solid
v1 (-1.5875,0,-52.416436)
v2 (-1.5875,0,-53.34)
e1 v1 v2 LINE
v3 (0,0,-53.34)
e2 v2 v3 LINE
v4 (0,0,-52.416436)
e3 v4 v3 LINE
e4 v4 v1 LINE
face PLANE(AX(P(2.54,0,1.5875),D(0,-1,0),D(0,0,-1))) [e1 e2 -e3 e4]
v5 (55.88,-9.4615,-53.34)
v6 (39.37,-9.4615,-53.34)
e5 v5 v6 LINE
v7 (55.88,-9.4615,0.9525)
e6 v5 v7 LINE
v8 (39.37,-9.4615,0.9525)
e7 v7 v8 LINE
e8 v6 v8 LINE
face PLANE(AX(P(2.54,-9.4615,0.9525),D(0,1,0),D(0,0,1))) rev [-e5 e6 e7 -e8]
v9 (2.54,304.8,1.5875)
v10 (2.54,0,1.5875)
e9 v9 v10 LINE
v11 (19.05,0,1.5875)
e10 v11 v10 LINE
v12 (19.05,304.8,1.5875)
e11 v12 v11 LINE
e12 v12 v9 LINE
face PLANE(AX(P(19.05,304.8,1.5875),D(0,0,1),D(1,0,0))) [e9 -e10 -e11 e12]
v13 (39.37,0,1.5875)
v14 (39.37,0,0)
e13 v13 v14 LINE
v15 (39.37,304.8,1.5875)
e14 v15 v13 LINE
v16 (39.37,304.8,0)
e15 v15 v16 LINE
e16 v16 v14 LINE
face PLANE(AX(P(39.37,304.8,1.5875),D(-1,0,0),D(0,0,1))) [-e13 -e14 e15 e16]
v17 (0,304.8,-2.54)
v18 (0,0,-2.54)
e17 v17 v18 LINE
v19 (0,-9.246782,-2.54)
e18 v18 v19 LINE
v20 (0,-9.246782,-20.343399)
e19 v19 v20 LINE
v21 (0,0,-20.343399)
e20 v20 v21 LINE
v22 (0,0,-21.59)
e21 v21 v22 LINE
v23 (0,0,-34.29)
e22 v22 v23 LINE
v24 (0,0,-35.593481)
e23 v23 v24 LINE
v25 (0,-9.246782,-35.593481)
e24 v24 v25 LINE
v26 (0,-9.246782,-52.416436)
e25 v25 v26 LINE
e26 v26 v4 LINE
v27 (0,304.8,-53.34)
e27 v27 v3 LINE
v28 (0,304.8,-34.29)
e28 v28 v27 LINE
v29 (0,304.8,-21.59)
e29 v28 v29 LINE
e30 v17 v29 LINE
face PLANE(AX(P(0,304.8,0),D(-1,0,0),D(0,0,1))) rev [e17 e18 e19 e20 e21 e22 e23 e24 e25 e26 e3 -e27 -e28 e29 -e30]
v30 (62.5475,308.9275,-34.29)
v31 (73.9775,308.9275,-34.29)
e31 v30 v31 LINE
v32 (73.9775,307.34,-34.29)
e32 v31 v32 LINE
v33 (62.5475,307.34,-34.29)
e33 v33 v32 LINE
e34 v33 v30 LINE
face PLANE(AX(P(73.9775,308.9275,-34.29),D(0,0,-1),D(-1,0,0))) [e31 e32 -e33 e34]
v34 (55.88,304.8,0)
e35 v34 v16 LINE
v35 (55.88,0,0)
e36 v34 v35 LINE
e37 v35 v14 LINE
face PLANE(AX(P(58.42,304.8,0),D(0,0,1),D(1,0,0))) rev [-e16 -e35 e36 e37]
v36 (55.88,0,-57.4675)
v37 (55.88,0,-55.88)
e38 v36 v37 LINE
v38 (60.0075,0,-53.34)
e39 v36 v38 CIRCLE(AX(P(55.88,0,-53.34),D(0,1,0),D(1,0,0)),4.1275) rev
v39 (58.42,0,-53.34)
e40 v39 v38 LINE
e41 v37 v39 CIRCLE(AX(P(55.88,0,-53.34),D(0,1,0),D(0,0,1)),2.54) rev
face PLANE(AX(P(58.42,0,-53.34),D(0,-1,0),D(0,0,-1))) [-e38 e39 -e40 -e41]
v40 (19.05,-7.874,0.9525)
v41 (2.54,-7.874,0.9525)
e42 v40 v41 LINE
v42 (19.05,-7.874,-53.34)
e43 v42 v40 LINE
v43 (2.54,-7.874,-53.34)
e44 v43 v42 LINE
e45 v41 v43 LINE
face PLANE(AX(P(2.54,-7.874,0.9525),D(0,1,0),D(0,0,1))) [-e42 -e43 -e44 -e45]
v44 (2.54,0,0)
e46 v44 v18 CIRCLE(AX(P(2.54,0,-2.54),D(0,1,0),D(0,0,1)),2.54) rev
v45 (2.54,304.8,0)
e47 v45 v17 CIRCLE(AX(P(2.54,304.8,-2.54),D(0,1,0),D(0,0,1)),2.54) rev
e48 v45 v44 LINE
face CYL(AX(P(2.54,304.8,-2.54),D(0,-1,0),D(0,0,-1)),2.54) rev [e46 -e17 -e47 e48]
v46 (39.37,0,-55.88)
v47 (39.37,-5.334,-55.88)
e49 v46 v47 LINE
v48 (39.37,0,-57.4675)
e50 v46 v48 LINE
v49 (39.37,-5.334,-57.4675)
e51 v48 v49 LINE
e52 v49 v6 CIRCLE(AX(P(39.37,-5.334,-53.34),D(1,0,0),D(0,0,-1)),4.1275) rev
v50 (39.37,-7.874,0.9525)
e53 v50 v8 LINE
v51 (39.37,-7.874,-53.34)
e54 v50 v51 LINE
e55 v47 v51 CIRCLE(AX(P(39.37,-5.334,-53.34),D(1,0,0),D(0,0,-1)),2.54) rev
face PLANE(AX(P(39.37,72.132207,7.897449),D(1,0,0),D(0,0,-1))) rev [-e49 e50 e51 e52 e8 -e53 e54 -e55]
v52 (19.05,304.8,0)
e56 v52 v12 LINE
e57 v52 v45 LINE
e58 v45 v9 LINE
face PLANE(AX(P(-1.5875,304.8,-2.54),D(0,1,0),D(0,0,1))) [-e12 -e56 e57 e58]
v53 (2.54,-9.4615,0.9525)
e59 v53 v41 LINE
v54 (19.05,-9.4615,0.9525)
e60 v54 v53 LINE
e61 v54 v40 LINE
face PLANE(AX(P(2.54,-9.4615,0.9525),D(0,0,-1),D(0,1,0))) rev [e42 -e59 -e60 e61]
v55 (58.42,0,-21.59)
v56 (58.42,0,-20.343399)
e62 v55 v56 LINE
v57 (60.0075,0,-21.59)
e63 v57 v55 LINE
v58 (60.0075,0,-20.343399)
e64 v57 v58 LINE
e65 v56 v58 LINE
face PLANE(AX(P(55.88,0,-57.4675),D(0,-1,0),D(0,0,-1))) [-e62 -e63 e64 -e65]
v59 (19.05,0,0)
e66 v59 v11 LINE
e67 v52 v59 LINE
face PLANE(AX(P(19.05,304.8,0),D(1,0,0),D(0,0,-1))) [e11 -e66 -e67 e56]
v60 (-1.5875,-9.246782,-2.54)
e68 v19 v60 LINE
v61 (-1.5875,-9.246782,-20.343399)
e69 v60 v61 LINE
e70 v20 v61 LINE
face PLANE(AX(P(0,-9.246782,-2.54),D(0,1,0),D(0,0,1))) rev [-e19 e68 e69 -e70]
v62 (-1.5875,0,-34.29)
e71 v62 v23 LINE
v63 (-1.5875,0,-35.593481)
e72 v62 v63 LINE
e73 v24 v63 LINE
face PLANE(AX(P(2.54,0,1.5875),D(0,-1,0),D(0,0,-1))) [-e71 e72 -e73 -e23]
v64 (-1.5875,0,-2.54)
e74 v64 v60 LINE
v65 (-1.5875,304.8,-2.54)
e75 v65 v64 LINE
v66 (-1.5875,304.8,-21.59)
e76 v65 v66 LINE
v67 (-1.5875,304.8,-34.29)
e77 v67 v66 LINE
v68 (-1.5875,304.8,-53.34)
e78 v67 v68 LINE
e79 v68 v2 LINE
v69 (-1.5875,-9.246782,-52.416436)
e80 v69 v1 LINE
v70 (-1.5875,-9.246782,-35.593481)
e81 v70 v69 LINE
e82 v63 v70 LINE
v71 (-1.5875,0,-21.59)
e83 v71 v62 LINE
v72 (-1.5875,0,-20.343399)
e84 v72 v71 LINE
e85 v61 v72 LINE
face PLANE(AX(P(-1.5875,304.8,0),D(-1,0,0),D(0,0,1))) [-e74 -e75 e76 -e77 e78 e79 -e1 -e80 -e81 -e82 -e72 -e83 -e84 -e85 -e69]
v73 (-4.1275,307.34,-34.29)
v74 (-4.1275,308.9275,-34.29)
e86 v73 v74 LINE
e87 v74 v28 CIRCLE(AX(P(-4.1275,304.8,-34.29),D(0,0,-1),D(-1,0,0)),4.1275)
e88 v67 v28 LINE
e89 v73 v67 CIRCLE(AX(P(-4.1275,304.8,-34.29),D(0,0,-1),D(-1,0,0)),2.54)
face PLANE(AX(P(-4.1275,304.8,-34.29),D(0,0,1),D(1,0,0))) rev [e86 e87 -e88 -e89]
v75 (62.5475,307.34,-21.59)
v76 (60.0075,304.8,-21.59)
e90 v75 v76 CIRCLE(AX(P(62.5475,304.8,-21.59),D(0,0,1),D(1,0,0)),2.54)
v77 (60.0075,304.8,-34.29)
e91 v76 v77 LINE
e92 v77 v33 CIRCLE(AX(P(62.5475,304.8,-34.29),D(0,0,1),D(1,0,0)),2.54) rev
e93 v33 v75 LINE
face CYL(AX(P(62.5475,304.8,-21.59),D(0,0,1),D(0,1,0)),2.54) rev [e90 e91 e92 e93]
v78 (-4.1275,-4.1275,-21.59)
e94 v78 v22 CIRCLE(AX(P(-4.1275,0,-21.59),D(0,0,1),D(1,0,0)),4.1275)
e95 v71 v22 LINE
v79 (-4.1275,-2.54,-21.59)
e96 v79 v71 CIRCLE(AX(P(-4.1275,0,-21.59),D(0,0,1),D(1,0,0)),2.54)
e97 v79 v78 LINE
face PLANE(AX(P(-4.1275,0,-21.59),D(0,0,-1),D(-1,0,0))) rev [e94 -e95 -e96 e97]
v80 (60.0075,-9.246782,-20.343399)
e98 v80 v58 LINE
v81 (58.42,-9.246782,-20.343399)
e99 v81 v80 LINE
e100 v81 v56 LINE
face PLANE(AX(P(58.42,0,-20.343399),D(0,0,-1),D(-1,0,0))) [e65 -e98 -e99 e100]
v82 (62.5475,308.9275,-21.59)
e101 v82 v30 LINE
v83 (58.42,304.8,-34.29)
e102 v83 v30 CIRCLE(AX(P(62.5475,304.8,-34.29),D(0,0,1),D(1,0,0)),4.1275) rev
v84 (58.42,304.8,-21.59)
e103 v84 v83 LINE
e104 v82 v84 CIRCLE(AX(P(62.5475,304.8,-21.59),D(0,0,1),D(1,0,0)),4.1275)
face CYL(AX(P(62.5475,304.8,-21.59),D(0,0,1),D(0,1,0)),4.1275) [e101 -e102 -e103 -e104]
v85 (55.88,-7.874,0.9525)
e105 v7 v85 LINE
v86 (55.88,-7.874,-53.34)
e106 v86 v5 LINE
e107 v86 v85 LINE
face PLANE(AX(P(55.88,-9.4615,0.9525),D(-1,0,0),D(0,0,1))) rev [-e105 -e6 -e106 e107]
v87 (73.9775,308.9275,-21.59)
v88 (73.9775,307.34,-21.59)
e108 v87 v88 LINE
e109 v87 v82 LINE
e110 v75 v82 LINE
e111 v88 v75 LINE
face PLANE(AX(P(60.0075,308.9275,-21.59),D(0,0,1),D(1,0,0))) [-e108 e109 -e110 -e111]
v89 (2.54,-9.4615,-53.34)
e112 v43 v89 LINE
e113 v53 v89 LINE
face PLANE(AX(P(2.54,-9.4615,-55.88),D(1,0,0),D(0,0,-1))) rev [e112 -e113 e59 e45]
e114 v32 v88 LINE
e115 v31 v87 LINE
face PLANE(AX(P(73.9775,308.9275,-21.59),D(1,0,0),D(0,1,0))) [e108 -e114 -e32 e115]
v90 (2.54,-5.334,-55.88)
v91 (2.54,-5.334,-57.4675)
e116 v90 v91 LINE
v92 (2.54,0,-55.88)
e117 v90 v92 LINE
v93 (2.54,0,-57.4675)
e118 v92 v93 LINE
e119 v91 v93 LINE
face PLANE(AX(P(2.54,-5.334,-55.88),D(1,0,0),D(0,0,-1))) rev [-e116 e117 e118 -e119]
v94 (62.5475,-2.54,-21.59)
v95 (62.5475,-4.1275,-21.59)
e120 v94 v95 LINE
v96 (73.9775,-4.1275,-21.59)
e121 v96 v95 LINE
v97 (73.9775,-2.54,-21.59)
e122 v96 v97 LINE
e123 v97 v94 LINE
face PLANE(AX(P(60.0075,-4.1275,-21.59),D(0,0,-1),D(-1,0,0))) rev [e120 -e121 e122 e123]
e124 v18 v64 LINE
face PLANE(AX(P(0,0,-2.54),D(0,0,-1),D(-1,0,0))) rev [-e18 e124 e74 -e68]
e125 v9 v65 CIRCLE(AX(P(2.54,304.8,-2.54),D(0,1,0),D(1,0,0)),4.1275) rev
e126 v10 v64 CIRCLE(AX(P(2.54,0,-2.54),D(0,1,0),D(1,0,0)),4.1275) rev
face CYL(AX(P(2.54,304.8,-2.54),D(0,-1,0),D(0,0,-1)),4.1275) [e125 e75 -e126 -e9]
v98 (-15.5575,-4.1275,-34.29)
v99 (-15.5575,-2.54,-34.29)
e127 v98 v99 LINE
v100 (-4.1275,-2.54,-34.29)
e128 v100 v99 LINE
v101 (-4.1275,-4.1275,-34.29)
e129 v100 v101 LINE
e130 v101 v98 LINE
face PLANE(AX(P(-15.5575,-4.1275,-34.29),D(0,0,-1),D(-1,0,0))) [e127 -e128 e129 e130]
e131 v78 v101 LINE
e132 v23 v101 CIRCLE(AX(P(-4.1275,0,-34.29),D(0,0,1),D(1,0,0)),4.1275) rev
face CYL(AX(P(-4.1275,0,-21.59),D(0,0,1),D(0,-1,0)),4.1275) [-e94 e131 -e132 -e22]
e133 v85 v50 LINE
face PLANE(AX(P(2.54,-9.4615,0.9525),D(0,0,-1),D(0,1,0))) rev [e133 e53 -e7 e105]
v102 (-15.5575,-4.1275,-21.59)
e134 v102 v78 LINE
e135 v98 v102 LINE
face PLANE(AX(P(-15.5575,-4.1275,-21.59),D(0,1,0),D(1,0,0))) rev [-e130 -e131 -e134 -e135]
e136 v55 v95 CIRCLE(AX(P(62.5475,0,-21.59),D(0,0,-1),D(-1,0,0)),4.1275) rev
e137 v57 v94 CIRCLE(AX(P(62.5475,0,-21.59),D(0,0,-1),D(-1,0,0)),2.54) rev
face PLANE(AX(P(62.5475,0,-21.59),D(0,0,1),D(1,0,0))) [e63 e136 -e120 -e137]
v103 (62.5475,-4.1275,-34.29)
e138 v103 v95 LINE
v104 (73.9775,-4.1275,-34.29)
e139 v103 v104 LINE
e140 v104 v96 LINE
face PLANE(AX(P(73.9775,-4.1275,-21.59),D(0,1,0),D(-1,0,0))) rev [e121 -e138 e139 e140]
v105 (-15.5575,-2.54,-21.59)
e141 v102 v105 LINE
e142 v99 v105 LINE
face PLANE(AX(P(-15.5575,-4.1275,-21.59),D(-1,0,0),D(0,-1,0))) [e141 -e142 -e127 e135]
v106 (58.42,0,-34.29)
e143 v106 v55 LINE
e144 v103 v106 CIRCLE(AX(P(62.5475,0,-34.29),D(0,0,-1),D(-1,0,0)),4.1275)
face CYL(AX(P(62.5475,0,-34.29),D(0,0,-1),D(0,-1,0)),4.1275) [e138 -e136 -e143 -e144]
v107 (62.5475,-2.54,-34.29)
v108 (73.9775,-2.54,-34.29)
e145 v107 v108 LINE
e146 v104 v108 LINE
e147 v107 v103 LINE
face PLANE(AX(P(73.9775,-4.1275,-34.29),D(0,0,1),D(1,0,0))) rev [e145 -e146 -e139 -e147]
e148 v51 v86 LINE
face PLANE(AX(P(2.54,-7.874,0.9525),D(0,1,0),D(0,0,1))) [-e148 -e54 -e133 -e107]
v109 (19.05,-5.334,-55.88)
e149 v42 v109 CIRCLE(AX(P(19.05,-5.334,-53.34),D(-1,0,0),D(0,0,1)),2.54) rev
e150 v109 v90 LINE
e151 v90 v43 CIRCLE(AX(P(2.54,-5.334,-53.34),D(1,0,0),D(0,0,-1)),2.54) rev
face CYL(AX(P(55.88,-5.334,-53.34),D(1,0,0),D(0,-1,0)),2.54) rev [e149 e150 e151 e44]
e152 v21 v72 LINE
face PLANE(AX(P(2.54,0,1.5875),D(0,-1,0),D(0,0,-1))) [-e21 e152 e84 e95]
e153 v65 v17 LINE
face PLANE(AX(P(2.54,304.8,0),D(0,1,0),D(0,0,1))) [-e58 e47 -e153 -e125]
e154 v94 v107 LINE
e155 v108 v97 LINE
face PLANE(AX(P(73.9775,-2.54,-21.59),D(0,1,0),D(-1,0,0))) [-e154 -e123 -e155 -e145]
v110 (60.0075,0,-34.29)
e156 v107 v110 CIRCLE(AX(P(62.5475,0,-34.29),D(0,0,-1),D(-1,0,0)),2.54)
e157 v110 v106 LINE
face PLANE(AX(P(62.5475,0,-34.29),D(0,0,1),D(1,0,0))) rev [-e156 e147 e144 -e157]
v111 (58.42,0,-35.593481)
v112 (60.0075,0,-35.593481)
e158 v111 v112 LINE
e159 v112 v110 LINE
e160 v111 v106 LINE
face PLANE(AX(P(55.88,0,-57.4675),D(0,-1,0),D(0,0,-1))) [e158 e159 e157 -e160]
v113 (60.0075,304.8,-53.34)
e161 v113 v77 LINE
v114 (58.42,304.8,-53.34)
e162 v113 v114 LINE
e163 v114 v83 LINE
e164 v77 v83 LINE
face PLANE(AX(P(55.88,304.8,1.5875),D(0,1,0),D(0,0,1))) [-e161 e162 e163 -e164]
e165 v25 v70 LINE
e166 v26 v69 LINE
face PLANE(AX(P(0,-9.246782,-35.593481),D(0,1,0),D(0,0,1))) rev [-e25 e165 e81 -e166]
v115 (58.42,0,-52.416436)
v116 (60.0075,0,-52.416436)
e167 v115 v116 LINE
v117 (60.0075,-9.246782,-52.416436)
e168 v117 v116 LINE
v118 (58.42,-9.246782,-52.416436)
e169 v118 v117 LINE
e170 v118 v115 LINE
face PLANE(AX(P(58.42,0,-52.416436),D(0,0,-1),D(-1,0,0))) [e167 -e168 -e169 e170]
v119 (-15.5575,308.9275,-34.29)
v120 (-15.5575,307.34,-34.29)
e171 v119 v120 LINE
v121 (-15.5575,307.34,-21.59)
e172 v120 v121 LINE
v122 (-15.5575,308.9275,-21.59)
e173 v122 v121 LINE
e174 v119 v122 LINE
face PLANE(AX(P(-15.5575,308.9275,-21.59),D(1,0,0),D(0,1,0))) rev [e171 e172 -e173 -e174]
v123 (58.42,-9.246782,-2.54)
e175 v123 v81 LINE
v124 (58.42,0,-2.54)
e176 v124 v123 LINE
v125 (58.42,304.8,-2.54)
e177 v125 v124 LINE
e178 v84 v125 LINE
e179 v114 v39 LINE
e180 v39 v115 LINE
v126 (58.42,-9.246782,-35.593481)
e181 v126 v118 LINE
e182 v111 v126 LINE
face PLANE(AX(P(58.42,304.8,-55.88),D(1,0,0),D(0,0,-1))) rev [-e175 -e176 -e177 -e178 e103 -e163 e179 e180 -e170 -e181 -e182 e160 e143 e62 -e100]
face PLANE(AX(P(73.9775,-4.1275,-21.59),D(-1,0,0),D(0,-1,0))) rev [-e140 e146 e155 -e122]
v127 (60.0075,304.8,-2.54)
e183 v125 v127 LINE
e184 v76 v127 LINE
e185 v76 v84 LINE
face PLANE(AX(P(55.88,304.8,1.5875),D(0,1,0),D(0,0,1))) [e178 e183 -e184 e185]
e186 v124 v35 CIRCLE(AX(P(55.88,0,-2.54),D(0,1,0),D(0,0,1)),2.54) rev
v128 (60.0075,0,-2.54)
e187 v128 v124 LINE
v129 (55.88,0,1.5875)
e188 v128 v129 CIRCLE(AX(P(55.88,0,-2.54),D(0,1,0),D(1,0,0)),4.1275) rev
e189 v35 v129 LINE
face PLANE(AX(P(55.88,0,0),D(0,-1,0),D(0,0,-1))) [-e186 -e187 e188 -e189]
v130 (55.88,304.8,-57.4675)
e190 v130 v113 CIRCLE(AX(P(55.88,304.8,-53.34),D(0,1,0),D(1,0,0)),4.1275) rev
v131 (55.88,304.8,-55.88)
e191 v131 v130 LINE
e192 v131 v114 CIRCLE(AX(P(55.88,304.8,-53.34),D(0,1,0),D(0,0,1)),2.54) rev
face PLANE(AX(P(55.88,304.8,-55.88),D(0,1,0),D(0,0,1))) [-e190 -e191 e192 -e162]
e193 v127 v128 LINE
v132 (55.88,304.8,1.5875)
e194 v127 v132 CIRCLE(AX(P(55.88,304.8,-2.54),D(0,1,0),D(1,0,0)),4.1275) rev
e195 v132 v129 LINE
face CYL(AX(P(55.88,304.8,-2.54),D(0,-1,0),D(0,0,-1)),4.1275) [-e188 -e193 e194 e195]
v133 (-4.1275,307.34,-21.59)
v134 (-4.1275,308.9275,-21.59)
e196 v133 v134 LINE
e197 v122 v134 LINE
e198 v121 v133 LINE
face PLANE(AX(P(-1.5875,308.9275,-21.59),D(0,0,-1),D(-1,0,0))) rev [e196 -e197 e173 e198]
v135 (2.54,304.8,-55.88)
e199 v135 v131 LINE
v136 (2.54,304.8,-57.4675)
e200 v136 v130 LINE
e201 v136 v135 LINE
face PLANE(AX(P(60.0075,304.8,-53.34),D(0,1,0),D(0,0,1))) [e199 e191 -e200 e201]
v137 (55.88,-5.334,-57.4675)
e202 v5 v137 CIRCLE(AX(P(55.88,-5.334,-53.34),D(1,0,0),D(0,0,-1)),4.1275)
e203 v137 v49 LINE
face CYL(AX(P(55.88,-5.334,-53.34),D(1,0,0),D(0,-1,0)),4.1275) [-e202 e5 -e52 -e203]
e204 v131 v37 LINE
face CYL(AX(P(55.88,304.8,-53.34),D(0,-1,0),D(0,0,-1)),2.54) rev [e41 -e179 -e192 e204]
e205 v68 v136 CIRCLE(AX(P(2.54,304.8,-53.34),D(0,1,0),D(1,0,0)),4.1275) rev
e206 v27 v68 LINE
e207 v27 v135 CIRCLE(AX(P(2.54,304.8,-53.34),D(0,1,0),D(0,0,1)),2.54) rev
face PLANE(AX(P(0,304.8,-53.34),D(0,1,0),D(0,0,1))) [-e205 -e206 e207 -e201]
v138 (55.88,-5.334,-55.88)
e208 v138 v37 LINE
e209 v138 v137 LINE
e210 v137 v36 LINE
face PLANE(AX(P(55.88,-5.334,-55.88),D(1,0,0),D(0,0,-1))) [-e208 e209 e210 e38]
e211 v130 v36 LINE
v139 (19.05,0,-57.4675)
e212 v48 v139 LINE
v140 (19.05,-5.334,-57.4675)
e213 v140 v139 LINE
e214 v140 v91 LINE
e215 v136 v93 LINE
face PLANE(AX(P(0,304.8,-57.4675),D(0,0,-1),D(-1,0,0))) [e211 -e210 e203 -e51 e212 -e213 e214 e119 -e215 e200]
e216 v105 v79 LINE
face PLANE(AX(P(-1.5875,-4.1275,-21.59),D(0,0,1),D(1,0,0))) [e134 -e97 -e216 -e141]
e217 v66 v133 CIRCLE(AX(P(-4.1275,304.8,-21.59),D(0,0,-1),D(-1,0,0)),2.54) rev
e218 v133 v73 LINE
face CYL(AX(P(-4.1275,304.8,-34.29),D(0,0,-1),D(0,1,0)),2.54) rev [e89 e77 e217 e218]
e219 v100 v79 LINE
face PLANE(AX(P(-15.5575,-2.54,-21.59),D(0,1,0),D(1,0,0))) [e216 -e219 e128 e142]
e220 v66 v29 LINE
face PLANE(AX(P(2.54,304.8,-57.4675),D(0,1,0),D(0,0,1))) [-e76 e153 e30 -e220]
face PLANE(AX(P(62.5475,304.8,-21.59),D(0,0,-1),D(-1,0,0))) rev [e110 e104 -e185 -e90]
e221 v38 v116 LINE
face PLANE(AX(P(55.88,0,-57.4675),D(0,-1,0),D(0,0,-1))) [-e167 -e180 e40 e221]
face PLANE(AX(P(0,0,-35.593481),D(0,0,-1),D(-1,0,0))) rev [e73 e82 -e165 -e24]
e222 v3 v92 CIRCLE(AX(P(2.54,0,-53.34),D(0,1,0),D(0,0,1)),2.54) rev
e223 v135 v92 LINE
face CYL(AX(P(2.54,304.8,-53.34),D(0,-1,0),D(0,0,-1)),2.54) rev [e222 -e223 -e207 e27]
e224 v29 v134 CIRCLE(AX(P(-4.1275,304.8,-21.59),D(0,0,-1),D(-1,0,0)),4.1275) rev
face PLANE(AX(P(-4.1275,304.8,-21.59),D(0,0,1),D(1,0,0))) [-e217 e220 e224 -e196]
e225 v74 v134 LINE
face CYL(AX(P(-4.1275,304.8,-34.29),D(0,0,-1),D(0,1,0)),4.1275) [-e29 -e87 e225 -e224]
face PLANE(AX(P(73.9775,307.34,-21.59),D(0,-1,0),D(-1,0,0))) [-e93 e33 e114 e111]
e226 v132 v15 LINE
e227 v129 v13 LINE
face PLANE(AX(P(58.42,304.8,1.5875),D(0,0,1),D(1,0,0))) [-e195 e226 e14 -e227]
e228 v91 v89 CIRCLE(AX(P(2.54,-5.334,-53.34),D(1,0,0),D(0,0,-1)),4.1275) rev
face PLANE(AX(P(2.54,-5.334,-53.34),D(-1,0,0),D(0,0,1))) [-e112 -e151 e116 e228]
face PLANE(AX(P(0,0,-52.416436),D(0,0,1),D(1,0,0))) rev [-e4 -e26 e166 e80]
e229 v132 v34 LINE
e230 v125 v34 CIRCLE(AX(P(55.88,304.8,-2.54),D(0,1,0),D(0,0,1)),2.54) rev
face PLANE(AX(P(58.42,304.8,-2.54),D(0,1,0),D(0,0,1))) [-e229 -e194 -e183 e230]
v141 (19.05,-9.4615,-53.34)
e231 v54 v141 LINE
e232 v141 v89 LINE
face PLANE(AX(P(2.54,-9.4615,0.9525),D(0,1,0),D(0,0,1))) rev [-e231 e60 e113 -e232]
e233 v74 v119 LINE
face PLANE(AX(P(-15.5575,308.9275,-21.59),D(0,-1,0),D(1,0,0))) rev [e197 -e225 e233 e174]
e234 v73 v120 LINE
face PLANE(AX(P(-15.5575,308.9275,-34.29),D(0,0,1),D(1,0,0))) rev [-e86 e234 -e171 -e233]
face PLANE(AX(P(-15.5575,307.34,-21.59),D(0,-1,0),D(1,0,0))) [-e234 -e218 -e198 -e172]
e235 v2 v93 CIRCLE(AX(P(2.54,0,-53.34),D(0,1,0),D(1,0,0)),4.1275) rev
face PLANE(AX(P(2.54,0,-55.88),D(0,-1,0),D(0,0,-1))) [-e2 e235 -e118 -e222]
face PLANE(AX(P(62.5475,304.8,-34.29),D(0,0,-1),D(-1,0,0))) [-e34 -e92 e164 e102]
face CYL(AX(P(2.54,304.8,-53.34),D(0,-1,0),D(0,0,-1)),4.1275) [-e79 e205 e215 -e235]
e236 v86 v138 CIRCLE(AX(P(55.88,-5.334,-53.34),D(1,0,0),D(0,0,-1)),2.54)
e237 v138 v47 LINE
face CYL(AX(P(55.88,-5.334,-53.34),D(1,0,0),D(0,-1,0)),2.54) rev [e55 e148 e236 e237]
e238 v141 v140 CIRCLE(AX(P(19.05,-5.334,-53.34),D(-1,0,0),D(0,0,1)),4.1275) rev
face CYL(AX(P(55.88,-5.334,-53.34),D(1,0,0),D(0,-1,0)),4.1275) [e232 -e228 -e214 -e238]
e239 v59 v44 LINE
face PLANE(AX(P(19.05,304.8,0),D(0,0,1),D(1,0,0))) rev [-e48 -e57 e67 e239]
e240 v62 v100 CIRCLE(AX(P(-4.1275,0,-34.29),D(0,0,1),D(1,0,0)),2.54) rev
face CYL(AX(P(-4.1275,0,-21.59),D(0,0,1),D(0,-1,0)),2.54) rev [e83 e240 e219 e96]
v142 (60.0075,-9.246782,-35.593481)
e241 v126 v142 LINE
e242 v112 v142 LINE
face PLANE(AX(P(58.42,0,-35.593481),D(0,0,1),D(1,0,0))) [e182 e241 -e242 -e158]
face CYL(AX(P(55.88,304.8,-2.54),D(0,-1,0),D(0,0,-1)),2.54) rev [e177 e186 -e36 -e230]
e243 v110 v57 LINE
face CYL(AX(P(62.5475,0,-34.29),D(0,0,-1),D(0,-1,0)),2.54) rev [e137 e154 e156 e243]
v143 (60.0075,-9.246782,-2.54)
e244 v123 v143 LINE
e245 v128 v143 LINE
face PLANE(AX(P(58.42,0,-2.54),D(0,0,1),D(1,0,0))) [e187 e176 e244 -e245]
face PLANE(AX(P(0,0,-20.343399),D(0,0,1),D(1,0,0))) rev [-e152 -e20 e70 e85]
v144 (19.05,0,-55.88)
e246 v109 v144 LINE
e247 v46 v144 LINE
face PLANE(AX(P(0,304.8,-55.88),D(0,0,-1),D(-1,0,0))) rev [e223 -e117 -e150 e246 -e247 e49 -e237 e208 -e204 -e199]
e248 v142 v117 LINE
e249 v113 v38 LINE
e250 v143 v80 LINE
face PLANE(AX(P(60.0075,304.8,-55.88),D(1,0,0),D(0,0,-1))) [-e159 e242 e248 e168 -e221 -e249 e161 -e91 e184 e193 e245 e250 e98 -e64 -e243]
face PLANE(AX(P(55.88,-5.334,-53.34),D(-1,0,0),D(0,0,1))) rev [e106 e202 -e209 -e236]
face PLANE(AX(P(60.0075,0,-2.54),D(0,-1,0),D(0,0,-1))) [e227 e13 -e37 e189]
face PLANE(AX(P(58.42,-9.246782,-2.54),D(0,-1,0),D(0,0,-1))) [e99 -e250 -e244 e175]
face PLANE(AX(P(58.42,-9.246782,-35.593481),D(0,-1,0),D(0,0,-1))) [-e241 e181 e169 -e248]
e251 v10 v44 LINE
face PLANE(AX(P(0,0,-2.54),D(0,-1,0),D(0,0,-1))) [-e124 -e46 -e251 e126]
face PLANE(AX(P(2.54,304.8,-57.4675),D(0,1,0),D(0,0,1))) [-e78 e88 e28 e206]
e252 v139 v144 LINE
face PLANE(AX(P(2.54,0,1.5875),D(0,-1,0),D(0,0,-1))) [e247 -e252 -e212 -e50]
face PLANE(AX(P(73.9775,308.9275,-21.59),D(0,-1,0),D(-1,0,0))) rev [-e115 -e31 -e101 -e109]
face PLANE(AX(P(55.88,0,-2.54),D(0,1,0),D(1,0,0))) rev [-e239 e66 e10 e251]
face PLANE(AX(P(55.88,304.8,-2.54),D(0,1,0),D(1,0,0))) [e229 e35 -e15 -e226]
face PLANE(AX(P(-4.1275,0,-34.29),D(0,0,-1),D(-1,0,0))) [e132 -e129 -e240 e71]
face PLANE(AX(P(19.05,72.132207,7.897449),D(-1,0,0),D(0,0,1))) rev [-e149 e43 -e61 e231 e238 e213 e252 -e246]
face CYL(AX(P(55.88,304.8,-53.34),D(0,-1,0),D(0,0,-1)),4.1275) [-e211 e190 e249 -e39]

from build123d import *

# Parameters (mm, degrees)
BASE_FLANGE1_DEPTH   = 304.8
EDGE_FLANGE3_DEPTH   = 53.34
SKETCH14_W           = 20.32
SKETCH14_H           = 69.210930463
CUT_EXTRUDE1_DEPTH   = 9.4615
EDGE_FLANGE4_DEPTH   = 12.7
MIRROR2_COPY_1_DEPTH = 12.7
SKETCH22_W           = 17.803399203
SKETCH22_H           = 9.246782325
SKETCH22_W_2         = 16.822955406
TAB1_DEPTH           = 1.5875


# Sheet-metal steps are written as plain solids
with BuildPart() as part:
    # Sketch1 → Base-Flange1 (new body)
    with BuildSketch(Plane(origin=(0, 0, 0), x_dir=(1, 0, 0), z_dir=(0, 1, 0))):
        with BuildLine():
            Line((19.05, 0), (2.54, 0))
            ThreePointArc((2.54, 0), (0.743948776, 0.743948776), (0, 2.54))
            Line((0, 2.54), (0, 53.34))
            ThreePointArc((0, 53.34), (0.743948776, 55.136051224), (2.54, 55.88))
            Line((2.54, 55.88), (55.88, 55.88))
            ThreePointArc((55.88, 55.88), (57.676051224, 55.136051224), (58.42, 53.34))
            Line((58.42, 53.34), (58.42, 2.54))
            ThreePointArc((58.42, 2.54), (57.676051224, 0.743948776), (55.88, 0))
            Line((55.88, 0), (39.37, 0))
            Line((39.37, 0), (39.37, -1.5875))
            Line((39.37, -1.5875), (55.88, -1.5875))
            ThreePointArc((55.88, -1.5875), (58.798583239, -0.378583239), (60.0075, 2.54))
            Line((60.0075, 2.54), (60.0075, 53.34))
            ThreePointArc((60.0075, 53.34), (58.798583239, 56.258583239), (55.88, 57.4675))
            Line((55.88, 57.4675), (2.54, 57.4675))
            ThreePointArc((2.54, 57.4675), (-0.378583239, 56.258583239), (-1.5875, 53.34))
            Line((-1.5875, 53.34), (-1.5875, 2.54))
            ThreePointArc((-1.5875, 2.54), (-0.378583239, -0.378583239), (2.54, -1.5875))
            Line((2.54, -1.5875), (19.05, -1.5875))
            Line((19.05, -1.5875), (19.05, 0))
        make_face()
    extrude(amount=BASE_FLANGE1_DEPTH)

    # Edge-Flange3 section (across the edge) → Edge-Flange3 (add)
    with BuildSketch(Plane(origin=(2.54, -7.874, -55.88), x_dir=(0, 1, 0), z_dir=(1, 0, 0))):
        with BuildLine():
            Line((-1.5875, 2.54), (-1.5875, 56.8325))
            Line((-1.5875, 56.8325), (0, 56.8325))
            Line((0, 56.8325), (0, 2.54))
            ThreePointArc((0, 2.54), (0.743948776, 0.743948776), (2.54, 0))
            Line((2.54, 0), (7.874, 0))
            Line((7.874, 0), (7.874, -1.5875))
            Line((7.874, -1.5875), (2.54, -1.5875))
            ThreePointArc((2.54, -1.5875), (-0.378583239, -0.378583239), (-1.5875, 2.54))
        make_face()
    extrude(amount=EDGE_FLANGE3_DEPTH)

    # Sketch14 → Cut-Extrude1 (cut)
    with BuildSketch(Plane.XZ.offset(9.4615)):
        with Locations((29.21, -26.70801644)):
            Rectangle(SKETCH14_W, SKETCH14_H)
    extrude(amount=-CUT_EXTRUDE1_DEPTH, mode=Mode.SUBTRACT)

    # Edge-Flange4 section (across the edge) → Edge-Flange4 (add)
    with BuildSketch(Plane(origin=(-1.5875, 307.34, -21.59), x_dir=(0, -1, 0), z_dir=(0, 0, -1))):
        with BuildLine():
            Line((-1.5875, 2.54), (-1.5875, 13.97))
            Line((-1.5875, 13.97), (0, 13.97))
            Line((0, 13.97), (0, 2.54))
            ThreePointArc((0, 2.54), (0.743948776, 0.743948776), (2.54, 0))
            Line((2.54, 0), (2.54, -1.5875))
            ThreePointArc((2.54, -1.5875), (-0.378583239, -0.378583239), (-1.5875, 2.54))
        make_face()
    edge_flange4 = extrude(amount=EDGE_FLANGE4_DEPTH)

    # Mirror1: Edge-Flange4 across plane
    add(edge_flange4.mirror(Plane(origin=(29.21, 0, 0), x_dir=(0, 0, 1), z_dir=(1, 0, 0))))

    # Mirror2: Edge-Flange4 across plane
    add(edge_flange4.mirror(Plane.ZX.offset(152.4)))

    # Mirror2 copy 1 sketch → Mirror2 copy 1 (add)
    with BuildSketch(Plane(origin=(60.0075, -2.54, -21.59), x_dir=(0, 1, 0), z_dir=(0, 0, -1))):
        with BuildLine():
            Line((-1.5875, 2.54), (-1.5875, 13.97))
            Line((-1.5875, 13.97), (0, 13.97))
            Line((0, 13.97), (0, 2.54))
            ThreePointArc((0, 2.54), (0.743948776, 0.743948776), (2.54, 0))
            Line((2.54, 0), (2.54, -1.5875))
            ThreePointArc((2.54, -1.5875), (-0.378583239, -0.378583239), (-1.5875, 2.54))
        make_face()
    extrude(amount=MIRROR2_COPY_1_DEPTH)

    # Sketch22 → Tab1 (add)
    with BuildSketch(Plane(origin=(60.0075, 0, 0), x_dir=(0, 0, -1), z_dir=(1, 0, 0))):
        with Locations((11.441699601, -4.623391162)):
            Rectangle(SKETCH22_W, SKETCH22_H)
        with Locations((44.004958561, -4.623391162)):
            Rectangle(SKETCH22_W_2, SKETCH22_H)
    tab1 = extrude(amount=-TAB1_DEPTH)

    # Mirror3: Tab1 across plane
    add(tab1.mirror(Plane(origin=(29.21, 0, 0), x_dir=(0, 0, 1), z_dir=(1, 0, 0))))


solid = part.part
